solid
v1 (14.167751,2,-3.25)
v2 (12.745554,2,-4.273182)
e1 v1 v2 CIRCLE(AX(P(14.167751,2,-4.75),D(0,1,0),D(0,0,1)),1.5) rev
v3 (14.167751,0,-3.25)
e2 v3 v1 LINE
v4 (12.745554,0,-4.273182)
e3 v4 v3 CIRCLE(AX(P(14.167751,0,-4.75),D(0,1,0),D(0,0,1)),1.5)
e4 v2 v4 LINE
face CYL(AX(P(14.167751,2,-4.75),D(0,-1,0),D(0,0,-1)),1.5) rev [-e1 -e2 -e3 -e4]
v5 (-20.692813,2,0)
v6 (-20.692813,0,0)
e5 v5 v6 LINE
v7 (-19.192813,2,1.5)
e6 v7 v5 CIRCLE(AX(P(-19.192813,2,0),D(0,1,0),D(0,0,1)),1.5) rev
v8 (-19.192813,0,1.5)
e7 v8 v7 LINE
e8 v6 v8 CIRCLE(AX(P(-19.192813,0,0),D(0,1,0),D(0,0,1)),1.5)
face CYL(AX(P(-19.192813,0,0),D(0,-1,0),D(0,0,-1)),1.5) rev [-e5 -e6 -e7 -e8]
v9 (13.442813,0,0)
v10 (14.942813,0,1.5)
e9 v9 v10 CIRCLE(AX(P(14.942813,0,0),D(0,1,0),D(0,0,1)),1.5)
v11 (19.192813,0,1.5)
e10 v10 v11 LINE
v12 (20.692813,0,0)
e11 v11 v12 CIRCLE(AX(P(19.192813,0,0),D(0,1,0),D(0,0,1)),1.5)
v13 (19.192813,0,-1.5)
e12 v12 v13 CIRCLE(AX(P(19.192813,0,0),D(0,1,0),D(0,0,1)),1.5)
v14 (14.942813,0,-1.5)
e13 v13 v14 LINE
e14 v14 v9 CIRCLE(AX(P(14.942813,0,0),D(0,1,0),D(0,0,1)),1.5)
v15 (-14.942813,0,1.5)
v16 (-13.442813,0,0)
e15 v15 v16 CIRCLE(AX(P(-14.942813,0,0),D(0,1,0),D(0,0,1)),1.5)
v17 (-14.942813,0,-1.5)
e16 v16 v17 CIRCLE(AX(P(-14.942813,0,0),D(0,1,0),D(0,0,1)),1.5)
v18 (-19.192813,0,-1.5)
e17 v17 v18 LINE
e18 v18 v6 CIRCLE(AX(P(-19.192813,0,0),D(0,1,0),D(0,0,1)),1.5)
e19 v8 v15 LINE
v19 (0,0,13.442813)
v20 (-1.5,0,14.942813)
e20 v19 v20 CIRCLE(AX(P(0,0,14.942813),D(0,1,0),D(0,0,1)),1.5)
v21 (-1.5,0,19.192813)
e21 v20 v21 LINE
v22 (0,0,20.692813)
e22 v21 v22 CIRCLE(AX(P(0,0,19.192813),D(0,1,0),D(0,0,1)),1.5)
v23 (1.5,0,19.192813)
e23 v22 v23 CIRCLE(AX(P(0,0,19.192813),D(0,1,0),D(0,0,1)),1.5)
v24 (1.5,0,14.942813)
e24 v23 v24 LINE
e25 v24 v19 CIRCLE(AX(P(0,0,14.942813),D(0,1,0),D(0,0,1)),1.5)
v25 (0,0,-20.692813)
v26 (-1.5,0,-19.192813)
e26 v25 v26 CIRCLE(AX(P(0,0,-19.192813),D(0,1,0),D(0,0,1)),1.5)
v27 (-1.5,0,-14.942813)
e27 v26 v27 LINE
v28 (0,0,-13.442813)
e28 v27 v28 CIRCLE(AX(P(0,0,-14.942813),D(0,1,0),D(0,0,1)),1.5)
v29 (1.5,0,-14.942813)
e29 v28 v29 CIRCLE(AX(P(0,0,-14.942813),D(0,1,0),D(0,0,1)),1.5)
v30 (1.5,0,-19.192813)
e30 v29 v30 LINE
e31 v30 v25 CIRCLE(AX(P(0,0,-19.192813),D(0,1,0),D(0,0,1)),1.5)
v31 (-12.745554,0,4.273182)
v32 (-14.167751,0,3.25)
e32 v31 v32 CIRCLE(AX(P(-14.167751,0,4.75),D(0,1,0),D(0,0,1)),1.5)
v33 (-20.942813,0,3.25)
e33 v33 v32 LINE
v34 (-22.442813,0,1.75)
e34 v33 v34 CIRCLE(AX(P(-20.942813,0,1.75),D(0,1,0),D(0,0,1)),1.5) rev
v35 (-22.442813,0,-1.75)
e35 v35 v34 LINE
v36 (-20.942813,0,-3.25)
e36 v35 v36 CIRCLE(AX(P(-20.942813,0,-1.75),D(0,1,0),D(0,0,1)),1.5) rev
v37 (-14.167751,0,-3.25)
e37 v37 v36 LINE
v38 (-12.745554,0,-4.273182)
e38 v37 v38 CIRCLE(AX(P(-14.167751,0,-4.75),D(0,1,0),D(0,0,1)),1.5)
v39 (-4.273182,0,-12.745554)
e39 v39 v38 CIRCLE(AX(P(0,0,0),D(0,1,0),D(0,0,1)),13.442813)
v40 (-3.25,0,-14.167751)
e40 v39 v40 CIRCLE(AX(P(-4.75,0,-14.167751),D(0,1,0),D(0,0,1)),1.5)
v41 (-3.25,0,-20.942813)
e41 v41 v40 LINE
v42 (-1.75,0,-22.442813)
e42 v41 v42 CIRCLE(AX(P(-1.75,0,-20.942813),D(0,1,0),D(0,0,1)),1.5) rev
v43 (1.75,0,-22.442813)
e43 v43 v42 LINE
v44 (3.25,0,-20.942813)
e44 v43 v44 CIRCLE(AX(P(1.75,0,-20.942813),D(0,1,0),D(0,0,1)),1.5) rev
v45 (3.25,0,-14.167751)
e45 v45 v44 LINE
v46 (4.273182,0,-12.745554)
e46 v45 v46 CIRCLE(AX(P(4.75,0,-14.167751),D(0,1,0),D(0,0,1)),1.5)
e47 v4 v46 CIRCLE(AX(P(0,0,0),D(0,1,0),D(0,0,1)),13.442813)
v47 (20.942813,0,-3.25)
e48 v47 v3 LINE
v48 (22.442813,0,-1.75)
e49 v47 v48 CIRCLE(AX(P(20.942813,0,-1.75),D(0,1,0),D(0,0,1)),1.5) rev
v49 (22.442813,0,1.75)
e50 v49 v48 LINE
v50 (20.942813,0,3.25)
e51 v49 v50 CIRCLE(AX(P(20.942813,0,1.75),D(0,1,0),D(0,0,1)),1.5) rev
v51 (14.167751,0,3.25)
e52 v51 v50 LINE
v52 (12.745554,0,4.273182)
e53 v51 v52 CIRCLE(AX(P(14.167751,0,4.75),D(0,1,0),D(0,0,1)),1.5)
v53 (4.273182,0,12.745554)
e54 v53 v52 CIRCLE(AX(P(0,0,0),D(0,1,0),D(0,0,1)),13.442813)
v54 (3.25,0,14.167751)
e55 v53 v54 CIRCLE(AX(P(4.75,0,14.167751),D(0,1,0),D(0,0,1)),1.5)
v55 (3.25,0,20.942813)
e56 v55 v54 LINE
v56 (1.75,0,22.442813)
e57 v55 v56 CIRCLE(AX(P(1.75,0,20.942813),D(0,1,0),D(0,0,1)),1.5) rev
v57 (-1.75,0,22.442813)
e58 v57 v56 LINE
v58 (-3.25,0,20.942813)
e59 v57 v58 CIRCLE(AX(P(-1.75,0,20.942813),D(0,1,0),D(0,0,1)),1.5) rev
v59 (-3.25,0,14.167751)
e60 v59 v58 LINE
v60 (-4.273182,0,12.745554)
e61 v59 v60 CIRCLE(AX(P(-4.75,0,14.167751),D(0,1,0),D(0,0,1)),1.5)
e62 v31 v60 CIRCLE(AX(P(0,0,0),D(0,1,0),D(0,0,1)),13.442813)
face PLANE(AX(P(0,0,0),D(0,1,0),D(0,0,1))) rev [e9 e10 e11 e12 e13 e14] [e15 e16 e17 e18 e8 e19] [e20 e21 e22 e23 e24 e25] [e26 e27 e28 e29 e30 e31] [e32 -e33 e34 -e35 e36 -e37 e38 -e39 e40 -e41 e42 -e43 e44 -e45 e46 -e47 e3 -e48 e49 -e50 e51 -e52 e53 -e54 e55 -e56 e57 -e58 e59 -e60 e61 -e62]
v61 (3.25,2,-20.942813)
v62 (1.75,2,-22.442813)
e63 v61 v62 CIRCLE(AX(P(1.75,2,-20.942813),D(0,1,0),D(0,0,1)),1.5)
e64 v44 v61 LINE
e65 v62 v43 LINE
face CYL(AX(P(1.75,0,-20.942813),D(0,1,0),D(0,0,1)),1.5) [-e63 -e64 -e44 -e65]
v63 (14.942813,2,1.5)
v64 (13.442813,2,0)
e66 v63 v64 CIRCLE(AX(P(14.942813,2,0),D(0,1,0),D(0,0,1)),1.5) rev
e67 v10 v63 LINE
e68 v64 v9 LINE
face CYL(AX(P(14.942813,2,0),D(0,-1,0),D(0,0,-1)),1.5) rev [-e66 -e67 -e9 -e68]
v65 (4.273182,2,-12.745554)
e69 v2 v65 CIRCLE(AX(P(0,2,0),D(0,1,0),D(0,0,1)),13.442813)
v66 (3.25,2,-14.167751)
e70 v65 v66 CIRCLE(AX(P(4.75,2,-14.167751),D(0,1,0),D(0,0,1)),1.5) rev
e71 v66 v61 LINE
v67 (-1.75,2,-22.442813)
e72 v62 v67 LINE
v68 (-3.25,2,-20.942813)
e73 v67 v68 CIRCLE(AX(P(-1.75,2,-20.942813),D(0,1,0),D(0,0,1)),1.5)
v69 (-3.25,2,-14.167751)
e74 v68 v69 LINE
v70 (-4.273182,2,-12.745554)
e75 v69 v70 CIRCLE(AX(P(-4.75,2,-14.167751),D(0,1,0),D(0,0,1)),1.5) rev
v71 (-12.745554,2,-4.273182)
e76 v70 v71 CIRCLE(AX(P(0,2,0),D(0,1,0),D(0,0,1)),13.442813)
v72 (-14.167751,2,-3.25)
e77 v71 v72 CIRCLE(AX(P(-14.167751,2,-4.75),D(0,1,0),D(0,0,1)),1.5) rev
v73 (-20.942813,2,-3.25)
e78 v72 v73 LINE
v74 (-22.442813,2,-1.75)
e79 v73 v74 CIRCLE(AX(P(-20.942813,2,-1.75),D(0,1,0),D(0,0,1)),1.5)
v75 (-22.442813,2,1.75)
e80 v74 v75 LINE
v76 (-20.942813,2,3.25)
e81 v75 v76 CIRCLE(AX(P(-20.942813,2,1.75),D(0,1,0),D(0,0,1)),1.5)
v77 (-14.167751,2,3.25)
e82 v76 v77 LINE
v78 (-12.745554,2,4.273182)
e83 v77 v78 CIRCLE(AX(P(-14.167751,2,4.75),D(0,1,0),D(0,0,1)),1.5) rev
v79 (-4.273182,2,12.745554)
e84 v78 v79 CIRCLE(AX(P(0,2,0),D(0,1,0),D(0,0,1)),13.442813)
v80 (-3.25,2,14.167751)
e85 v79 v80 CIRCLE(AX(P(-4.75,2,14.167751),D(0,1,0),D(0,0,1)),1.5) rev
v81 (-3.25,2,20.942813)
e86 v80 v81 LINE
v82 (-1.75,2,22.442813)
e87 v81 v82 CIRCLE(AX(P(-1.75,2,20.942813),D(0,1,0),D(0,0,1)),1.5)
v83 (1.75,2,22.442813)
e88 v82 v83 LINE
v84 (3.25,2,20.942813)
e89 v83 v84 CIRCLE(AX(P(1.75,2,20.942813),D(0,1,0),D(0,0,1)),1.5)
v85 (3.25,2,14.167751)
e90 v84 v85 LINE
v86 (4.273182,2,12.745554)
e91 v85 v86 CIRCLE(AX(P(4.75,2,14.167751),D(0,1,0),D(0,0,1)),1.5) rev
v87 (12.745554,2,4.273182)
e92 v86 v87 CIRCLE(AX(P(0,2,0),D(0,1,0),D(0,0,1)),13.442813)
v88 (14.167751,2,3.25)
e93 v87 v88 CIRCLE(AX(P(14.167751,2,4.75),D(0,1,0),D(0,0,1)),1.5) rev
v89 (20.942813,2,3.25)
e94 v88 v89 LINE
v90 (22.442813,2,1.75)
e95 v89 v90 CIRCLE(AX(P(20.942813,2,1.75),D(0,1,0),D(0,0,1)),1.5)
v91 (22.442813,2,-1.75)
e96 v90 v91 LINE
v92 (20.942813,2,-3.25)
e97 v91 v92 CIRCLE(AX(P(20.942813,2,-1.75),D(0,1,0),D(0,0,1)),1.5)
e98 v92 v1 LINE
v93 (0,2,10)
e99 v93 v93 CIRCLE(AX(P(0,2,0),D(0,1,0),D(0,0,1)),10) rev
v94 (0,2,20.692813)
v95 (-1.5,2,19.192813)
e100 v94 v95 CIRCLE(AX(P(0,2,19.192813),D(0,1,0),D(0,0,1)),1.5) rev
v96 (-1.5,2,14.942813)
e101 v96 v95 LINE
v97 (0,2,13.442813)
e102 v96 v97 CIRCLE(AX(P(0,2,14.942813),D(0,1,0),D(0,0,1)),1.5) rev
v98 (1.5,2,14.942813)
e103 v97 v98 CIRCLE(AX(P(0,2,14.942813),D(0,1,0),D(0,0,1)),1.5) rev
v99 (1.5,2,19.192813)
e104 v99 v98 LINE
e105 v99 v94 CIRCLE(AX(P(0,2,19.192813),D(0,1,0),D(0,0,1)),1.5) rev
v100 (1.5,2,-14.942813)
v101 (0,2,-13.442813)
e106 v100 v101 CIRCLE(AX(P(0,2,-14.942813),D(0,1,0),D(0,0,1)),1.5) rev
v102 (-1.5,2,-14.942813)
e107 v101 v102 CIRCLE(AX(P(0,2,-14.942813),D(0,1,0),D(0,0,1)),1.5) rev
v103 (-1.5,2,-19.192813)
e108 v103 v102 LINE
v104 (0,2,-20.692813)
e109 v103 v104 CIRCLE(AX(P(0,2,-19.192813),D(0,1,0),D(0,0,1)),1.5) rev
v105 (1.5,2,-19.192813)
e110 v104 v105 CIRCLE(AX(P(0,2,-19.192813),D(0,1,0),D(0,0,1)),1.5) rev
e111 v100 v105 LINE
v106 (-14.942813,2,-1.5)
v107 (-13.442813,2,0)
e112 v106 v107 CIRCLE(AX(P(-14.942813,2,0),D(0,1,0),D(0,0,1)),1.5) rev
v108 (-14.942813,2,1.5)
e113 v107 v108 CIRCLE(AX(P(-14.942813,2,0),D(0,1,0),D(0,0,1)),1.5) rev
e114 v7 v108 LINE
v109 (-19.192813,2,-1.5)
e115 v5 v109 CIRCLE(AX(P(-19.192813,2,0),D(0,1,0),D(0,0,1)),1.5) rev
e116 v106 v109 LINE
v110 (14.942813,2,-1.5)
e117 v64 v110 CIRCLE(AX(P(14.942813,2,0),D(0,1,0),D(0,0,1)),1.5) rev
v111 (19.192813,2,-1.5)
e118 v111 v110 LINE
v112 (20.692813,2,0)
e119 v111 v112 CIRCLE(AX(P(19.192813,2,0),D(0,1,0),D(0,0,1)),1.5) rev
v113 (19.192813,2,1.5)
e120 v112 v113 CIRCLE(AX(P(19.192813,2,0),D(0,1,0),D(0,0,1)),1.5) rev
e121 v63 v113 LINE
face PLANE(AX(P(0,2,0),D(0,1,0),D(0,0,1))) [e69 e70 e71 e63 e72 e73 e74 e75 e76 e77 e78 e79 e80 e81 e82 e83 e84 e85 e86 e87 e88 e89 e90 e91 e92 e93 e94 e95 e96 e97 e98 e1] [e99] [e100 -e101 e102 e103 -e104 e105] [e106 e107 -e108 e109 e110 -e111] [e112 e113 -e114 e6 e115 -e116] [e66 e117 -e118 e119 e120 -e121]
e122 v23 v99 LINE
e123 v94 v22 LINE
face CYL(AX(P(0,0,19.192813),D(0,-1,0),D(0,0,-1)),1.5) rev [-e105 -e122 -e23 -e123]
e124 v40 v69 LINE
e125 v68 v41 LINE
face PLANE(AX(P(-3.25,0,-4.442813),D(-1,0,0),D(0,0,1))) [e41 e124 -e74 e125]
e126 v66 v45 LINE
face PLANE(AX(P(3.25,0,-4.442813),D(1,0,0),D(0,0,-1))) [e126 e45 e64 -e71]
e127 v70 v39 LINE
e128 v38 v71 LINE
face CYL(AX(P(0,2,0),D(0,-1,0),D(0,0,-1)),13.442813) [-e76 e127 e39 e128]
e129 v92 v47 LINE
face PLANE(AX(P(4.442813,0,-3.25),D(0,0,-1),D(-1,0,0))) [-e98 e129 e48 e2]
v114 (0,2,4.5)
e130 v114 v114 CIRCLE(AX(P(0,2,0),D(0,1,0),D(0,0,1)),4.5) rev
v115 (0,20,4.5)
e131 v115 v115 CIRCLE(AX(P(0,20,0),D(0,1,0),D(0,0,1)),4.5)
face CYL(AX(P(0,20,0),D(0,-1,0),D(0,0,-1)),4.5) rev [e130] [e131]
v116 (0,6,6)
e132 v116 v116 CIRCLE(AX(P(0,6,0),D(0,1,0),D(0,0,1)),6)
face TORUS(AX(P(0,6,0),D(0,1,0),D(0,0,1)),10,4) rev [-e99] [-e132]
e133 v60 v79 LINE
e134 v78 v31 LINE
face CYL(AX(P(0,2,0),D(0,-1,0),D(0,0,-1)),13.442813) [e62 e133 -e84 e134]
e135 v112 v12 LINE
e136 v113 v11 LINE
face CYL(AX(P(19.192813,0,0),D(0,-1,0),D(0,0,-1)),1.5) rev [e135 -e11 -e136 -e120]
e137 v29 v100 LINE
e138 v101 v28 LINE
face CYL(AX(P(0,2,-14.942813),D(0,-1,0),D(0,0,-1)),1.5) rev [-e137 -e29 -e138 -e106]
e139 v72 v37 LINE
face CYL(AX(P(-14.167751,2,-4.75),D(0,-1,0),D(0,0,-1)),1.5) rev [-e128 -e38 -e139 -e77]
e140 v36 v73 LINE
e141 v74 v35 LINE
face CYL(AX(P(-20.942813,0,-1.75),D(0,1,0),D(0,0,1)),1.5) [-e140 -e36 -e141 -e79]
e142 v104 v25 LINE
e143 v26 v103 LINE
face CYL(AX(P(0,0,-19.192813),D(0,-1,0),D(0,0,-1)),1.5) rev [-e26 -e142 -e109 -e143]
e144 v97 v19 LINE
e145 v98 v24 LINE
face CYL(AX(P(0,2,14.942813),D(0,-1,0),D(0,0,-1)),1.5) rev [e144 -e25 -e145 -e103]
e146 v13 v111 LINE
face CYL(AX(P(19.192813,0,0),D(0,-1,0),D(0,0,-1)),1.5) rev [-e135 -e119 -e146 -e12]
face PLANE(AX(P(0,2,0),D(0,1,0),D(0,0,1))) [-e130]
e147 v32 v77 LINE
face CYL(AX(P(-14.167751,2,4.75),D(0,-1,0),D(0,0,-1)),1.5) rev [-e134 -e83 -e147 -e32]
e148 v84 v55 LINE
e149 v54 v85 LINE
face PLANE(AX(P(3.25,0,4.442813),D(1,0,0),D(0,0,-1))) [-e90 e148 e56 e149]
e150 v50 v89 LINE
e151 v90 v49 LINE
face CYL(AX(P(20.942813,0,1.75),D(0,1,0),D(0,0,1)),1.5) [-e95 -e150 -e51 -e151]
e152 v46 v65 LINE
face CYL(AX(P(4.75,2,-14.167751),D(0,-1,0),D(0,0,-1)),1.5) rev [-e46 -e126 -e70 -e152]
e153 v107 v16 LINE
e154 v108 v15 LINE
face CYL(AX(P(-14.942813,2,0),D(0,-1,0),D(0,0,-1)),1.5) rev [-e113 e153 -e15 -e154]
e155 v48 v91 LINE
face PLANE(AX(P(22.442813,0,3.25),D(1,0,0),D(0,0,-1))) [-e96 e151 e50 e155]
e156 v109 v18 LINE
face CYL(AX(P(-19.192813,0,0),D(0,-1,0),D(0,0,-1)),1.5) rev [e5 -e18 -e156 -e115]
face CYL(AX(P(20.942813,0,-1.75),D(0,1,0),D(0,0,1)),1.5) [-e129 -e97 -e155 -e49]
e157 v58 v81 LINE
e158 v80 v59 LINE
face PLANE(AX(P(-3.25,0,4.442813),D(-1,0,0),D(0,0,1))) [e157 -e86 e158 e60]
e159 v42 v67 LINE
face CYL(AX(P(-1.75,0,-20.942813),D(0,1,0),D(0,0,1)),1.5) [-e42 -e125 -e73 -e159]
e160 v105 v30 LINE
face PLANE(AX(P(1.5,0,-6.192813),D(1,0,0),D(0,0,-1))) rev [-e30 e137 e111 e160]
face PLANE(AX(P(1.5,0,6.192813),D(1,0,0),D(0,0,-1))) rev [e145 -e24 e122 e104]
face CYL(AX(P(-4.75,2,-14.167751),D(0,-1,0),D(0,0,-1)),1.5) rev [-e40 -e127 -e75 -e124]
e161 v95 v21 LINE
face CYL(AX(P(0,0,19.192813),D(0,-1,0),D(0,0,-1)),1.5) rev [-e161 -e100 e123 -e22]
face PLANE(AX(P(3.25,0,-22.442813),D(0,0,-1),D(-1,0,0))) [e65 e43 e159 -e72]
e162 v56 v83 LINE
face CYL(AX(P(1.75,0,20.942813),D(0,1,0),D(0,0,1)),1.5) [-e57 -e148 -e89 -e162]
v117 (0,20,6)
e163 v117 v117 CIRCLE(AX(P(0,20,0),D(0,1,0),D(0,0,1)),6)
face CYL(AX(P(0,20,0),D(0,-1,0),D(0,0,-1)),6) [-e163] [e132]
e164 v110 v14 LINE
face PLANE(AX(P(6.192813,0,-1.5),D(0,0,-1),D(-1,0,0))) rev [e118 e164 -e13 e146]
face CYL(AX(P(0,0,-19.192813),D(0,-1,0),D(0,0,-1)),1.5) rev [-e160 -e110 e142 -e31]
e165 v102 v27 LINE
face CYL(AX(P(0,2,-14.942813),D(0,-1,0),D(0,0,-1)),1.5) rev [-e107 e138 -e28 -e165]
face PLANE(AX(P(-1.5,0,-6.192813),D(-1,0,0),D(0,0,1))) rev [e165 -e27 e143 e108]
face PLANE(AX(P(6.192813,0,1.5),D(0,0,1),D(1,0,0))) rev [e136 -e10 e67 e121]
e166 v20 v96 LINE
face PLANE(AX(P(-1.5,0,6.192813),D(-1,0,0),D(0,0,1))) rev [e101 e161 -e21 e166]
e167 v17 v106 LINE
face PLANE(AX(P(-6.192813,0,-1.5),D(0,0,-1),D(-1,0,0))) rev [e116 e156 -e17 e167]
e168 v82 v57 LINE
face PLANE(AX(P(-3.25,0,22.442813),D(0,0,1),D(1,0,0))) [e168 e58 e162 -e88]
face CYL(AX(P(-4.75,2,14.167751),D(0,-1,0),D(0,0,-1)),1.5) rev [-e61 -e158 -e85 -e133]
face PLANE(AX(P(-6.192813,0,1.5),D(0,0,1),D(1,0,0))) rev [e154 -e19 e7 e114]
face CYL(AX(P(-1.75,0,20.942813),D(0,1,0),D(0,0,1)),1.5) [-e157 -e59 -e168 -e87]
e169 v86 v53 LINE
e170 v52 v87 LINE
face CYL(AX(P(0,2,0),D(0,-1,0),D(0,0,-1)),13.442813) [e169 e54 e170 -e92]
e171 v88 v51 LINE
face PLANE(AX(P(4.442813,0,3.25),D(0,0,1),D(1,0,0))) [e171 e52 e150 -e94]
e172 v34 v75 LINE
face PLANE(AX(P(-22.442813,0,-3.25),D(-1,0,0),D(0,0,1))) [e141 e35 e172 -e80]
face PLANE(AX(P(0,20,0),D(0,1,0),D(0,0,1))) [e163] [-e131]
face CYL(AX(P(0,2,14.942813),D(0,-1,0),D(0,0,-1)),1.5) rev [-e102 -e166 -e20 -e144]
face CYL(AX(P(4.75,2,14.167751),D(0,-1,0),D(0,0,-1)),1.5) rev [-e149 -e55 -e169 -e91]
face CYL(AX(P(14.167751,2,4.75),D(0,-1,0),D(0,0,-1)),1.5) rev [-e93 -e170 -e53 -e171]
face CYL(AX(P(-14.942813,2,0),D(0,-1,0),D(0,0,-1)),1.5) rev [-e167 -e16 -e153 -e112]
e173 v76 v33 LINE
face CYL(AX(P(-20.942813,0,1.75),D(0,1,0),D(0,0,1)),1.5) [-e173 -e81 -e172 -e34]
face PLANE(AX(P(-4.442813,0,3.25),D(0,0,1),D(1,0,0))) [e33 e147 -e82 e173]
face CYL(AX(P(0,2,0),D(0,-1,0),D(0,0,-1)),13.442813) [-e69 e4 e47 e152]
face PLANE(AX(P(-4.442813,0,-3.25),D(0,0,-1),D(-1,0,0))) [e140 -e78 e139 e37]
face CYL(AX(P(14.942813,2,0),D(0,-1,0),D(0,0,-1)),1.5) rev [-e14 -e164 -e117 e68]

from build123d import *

# Parameters (mm, degrees)
SKETCH1_R                = 13.442813203
BOSS_EXTRUDE1_DEPTH      = 2
SKETCH2_W                = 6.5
SKETCH2_H                = 18
SKETCH2_W_2              = 3
SKETCH2_H_2              = 14.5
BOSS_EXTRUDE3_DEPTH      = 2
FILLET1_R                = 1.5
CIRPATTERN1_COUNT        = 4
FILLET1_OF_CIRPATTERN1_R = 1.5
SKETCH3_R                = 6
SKETCH3_R_2              = 4.5
BOSS_EXTRUDE4_DEPTH      = 18
FILLET2_R                = 4


with BuildPart() as part:
    # Sketch1 → Boss-Extrude1 (new body)
    with BuildSketch(Plane(origin=(0, 0, 0), x_dir=(1, 0, 0), z_dir=(0, 1, 0))):
        with Locations(Location((0, 0, 0), (0, 0, 270))):
            Circle(SKETCH1_R)
    extrude(amount=BOSS_EXTRUDE1_DEPTH)

    # Sketch2 → Boss-Extrude3 (add)
    with BuildSketch(Plane(origin=(0, 2, 0), x_dir=(1, 0, 0), z_dir=(0, 1, 0))):
        with Locations((0, 13.442813203)):
            Rectangle(SKETCH2_W, SKETCH2_H)
        with Locations((0, 13.442813203)):
            Rectangle(SKETCH2_W_2, SKETCH2_H_2, mode=Mode.SUBTRACT)
    boss_extrude3 = extrude(amount=-BOSS_EXTRUDE3_DEPTH)

    # Fillet1
    fillet1_edges = [part.edges().sort_by_distance(p)[0] for p in [
        (3.25, 1, -13.044030313),
        (3.25, 1, -22.442813203),
        (-3.25, 1, -22.442813203),
        (-3.25, 1, -13.044030313),
        (-1.5, 1, -13.35886323),
        (1.5, 1, -13.35886323),
        (1.5, 1, -20.692813203),
        (-1.5, 1, -20.692813203),
    ]]
    fillet(fillet1_edges, radius=FILLET1_R - 0.0001)  # a hair under: the kernel refuses the full size

    # CirPattern1: Boss-Extrude3 ×4 about axis
    cirpattern1_axis = Axis((0, 0, 0), (0, 1, 0))
    for i in range(1, CIRPATTERN1_COUNT):
        add(boss_extrude3.rotate(cirpattern1_axis, i * 360 / CIRPATTERN1_COUNT))

    # Fillet1 of CirPattern1
    fillet1_of_cirpattern1_edges = [part.edges().sort_by_distance(p)[0] for p in [
        (-13.044030313, 1, -3.25),
        (-22.442813203, 1, -3.25),
        (-22.442813203, 1, 3.25),
        (-13.044030313, 1, 3.25),
        (-13.35886323, 1, 1.5),
        (-13.35886323, 1, -1.5),
        (-20.692813203, 1, -1.5),
        (-20.692813203, 1, 1.5),
        (-3.25, 1, 13.044030313),
        (-3.25, 1, 22.442813203),
        (3.25, 1, 22.442813203),
        (3.25, 1, 13.044030313),
        (1.5, 1, 13.35886323),
        (-1.5, 1, 13.35886323),
        (-1.5, 1, 20.692813203),
        (1.5, 1, 20.692813203),
        (13.044030313, 1, 3.25),
        (22.442813203, 1, 3.25),
        (22.442813203, 1, -3.25),
        (13.044030313, 1, -3.25),
        (13.35886323, 1, -1.5),
        (13.35886323, 1, 1.5),
        (20.692813203, 1, 1.5),
        (20.692813203, 1, -1.5),
    ]]
    fillet(fillet1_of_cirpattern1_edges, radius=FILLET1_OF_CIRPATTERN1_R - 0.0001)  # a hair under: the kernel refuses the full size

    # Sketch3 → Boss-Extrude4 (add)
    with BuildSketch(Plane(origin=(0, 2, 0), x_dir=(1, 0, 0), z_dir=(0, 1, 0))):
        with Locations(Location((0, 0, 0), (0, 0, 270))):
            Circle(SKETCH3_R)
        with Locations(Location((0, 0, 0), (0, 0, 270))):
            Circle(SKETCH3_R_2, mode=Mode.SUBTRACT)
    extrude(amount=BOSS_EXTRUDE4_DEPTH)

    # Fillet2
    fillet2_edges = [part.edges().sort_by_distance(p)[0] for p in [
        (0, 2, -6),
    ]]
    fillet(fillet2_edges, radius=FILLET2_R)


solid = part.part
